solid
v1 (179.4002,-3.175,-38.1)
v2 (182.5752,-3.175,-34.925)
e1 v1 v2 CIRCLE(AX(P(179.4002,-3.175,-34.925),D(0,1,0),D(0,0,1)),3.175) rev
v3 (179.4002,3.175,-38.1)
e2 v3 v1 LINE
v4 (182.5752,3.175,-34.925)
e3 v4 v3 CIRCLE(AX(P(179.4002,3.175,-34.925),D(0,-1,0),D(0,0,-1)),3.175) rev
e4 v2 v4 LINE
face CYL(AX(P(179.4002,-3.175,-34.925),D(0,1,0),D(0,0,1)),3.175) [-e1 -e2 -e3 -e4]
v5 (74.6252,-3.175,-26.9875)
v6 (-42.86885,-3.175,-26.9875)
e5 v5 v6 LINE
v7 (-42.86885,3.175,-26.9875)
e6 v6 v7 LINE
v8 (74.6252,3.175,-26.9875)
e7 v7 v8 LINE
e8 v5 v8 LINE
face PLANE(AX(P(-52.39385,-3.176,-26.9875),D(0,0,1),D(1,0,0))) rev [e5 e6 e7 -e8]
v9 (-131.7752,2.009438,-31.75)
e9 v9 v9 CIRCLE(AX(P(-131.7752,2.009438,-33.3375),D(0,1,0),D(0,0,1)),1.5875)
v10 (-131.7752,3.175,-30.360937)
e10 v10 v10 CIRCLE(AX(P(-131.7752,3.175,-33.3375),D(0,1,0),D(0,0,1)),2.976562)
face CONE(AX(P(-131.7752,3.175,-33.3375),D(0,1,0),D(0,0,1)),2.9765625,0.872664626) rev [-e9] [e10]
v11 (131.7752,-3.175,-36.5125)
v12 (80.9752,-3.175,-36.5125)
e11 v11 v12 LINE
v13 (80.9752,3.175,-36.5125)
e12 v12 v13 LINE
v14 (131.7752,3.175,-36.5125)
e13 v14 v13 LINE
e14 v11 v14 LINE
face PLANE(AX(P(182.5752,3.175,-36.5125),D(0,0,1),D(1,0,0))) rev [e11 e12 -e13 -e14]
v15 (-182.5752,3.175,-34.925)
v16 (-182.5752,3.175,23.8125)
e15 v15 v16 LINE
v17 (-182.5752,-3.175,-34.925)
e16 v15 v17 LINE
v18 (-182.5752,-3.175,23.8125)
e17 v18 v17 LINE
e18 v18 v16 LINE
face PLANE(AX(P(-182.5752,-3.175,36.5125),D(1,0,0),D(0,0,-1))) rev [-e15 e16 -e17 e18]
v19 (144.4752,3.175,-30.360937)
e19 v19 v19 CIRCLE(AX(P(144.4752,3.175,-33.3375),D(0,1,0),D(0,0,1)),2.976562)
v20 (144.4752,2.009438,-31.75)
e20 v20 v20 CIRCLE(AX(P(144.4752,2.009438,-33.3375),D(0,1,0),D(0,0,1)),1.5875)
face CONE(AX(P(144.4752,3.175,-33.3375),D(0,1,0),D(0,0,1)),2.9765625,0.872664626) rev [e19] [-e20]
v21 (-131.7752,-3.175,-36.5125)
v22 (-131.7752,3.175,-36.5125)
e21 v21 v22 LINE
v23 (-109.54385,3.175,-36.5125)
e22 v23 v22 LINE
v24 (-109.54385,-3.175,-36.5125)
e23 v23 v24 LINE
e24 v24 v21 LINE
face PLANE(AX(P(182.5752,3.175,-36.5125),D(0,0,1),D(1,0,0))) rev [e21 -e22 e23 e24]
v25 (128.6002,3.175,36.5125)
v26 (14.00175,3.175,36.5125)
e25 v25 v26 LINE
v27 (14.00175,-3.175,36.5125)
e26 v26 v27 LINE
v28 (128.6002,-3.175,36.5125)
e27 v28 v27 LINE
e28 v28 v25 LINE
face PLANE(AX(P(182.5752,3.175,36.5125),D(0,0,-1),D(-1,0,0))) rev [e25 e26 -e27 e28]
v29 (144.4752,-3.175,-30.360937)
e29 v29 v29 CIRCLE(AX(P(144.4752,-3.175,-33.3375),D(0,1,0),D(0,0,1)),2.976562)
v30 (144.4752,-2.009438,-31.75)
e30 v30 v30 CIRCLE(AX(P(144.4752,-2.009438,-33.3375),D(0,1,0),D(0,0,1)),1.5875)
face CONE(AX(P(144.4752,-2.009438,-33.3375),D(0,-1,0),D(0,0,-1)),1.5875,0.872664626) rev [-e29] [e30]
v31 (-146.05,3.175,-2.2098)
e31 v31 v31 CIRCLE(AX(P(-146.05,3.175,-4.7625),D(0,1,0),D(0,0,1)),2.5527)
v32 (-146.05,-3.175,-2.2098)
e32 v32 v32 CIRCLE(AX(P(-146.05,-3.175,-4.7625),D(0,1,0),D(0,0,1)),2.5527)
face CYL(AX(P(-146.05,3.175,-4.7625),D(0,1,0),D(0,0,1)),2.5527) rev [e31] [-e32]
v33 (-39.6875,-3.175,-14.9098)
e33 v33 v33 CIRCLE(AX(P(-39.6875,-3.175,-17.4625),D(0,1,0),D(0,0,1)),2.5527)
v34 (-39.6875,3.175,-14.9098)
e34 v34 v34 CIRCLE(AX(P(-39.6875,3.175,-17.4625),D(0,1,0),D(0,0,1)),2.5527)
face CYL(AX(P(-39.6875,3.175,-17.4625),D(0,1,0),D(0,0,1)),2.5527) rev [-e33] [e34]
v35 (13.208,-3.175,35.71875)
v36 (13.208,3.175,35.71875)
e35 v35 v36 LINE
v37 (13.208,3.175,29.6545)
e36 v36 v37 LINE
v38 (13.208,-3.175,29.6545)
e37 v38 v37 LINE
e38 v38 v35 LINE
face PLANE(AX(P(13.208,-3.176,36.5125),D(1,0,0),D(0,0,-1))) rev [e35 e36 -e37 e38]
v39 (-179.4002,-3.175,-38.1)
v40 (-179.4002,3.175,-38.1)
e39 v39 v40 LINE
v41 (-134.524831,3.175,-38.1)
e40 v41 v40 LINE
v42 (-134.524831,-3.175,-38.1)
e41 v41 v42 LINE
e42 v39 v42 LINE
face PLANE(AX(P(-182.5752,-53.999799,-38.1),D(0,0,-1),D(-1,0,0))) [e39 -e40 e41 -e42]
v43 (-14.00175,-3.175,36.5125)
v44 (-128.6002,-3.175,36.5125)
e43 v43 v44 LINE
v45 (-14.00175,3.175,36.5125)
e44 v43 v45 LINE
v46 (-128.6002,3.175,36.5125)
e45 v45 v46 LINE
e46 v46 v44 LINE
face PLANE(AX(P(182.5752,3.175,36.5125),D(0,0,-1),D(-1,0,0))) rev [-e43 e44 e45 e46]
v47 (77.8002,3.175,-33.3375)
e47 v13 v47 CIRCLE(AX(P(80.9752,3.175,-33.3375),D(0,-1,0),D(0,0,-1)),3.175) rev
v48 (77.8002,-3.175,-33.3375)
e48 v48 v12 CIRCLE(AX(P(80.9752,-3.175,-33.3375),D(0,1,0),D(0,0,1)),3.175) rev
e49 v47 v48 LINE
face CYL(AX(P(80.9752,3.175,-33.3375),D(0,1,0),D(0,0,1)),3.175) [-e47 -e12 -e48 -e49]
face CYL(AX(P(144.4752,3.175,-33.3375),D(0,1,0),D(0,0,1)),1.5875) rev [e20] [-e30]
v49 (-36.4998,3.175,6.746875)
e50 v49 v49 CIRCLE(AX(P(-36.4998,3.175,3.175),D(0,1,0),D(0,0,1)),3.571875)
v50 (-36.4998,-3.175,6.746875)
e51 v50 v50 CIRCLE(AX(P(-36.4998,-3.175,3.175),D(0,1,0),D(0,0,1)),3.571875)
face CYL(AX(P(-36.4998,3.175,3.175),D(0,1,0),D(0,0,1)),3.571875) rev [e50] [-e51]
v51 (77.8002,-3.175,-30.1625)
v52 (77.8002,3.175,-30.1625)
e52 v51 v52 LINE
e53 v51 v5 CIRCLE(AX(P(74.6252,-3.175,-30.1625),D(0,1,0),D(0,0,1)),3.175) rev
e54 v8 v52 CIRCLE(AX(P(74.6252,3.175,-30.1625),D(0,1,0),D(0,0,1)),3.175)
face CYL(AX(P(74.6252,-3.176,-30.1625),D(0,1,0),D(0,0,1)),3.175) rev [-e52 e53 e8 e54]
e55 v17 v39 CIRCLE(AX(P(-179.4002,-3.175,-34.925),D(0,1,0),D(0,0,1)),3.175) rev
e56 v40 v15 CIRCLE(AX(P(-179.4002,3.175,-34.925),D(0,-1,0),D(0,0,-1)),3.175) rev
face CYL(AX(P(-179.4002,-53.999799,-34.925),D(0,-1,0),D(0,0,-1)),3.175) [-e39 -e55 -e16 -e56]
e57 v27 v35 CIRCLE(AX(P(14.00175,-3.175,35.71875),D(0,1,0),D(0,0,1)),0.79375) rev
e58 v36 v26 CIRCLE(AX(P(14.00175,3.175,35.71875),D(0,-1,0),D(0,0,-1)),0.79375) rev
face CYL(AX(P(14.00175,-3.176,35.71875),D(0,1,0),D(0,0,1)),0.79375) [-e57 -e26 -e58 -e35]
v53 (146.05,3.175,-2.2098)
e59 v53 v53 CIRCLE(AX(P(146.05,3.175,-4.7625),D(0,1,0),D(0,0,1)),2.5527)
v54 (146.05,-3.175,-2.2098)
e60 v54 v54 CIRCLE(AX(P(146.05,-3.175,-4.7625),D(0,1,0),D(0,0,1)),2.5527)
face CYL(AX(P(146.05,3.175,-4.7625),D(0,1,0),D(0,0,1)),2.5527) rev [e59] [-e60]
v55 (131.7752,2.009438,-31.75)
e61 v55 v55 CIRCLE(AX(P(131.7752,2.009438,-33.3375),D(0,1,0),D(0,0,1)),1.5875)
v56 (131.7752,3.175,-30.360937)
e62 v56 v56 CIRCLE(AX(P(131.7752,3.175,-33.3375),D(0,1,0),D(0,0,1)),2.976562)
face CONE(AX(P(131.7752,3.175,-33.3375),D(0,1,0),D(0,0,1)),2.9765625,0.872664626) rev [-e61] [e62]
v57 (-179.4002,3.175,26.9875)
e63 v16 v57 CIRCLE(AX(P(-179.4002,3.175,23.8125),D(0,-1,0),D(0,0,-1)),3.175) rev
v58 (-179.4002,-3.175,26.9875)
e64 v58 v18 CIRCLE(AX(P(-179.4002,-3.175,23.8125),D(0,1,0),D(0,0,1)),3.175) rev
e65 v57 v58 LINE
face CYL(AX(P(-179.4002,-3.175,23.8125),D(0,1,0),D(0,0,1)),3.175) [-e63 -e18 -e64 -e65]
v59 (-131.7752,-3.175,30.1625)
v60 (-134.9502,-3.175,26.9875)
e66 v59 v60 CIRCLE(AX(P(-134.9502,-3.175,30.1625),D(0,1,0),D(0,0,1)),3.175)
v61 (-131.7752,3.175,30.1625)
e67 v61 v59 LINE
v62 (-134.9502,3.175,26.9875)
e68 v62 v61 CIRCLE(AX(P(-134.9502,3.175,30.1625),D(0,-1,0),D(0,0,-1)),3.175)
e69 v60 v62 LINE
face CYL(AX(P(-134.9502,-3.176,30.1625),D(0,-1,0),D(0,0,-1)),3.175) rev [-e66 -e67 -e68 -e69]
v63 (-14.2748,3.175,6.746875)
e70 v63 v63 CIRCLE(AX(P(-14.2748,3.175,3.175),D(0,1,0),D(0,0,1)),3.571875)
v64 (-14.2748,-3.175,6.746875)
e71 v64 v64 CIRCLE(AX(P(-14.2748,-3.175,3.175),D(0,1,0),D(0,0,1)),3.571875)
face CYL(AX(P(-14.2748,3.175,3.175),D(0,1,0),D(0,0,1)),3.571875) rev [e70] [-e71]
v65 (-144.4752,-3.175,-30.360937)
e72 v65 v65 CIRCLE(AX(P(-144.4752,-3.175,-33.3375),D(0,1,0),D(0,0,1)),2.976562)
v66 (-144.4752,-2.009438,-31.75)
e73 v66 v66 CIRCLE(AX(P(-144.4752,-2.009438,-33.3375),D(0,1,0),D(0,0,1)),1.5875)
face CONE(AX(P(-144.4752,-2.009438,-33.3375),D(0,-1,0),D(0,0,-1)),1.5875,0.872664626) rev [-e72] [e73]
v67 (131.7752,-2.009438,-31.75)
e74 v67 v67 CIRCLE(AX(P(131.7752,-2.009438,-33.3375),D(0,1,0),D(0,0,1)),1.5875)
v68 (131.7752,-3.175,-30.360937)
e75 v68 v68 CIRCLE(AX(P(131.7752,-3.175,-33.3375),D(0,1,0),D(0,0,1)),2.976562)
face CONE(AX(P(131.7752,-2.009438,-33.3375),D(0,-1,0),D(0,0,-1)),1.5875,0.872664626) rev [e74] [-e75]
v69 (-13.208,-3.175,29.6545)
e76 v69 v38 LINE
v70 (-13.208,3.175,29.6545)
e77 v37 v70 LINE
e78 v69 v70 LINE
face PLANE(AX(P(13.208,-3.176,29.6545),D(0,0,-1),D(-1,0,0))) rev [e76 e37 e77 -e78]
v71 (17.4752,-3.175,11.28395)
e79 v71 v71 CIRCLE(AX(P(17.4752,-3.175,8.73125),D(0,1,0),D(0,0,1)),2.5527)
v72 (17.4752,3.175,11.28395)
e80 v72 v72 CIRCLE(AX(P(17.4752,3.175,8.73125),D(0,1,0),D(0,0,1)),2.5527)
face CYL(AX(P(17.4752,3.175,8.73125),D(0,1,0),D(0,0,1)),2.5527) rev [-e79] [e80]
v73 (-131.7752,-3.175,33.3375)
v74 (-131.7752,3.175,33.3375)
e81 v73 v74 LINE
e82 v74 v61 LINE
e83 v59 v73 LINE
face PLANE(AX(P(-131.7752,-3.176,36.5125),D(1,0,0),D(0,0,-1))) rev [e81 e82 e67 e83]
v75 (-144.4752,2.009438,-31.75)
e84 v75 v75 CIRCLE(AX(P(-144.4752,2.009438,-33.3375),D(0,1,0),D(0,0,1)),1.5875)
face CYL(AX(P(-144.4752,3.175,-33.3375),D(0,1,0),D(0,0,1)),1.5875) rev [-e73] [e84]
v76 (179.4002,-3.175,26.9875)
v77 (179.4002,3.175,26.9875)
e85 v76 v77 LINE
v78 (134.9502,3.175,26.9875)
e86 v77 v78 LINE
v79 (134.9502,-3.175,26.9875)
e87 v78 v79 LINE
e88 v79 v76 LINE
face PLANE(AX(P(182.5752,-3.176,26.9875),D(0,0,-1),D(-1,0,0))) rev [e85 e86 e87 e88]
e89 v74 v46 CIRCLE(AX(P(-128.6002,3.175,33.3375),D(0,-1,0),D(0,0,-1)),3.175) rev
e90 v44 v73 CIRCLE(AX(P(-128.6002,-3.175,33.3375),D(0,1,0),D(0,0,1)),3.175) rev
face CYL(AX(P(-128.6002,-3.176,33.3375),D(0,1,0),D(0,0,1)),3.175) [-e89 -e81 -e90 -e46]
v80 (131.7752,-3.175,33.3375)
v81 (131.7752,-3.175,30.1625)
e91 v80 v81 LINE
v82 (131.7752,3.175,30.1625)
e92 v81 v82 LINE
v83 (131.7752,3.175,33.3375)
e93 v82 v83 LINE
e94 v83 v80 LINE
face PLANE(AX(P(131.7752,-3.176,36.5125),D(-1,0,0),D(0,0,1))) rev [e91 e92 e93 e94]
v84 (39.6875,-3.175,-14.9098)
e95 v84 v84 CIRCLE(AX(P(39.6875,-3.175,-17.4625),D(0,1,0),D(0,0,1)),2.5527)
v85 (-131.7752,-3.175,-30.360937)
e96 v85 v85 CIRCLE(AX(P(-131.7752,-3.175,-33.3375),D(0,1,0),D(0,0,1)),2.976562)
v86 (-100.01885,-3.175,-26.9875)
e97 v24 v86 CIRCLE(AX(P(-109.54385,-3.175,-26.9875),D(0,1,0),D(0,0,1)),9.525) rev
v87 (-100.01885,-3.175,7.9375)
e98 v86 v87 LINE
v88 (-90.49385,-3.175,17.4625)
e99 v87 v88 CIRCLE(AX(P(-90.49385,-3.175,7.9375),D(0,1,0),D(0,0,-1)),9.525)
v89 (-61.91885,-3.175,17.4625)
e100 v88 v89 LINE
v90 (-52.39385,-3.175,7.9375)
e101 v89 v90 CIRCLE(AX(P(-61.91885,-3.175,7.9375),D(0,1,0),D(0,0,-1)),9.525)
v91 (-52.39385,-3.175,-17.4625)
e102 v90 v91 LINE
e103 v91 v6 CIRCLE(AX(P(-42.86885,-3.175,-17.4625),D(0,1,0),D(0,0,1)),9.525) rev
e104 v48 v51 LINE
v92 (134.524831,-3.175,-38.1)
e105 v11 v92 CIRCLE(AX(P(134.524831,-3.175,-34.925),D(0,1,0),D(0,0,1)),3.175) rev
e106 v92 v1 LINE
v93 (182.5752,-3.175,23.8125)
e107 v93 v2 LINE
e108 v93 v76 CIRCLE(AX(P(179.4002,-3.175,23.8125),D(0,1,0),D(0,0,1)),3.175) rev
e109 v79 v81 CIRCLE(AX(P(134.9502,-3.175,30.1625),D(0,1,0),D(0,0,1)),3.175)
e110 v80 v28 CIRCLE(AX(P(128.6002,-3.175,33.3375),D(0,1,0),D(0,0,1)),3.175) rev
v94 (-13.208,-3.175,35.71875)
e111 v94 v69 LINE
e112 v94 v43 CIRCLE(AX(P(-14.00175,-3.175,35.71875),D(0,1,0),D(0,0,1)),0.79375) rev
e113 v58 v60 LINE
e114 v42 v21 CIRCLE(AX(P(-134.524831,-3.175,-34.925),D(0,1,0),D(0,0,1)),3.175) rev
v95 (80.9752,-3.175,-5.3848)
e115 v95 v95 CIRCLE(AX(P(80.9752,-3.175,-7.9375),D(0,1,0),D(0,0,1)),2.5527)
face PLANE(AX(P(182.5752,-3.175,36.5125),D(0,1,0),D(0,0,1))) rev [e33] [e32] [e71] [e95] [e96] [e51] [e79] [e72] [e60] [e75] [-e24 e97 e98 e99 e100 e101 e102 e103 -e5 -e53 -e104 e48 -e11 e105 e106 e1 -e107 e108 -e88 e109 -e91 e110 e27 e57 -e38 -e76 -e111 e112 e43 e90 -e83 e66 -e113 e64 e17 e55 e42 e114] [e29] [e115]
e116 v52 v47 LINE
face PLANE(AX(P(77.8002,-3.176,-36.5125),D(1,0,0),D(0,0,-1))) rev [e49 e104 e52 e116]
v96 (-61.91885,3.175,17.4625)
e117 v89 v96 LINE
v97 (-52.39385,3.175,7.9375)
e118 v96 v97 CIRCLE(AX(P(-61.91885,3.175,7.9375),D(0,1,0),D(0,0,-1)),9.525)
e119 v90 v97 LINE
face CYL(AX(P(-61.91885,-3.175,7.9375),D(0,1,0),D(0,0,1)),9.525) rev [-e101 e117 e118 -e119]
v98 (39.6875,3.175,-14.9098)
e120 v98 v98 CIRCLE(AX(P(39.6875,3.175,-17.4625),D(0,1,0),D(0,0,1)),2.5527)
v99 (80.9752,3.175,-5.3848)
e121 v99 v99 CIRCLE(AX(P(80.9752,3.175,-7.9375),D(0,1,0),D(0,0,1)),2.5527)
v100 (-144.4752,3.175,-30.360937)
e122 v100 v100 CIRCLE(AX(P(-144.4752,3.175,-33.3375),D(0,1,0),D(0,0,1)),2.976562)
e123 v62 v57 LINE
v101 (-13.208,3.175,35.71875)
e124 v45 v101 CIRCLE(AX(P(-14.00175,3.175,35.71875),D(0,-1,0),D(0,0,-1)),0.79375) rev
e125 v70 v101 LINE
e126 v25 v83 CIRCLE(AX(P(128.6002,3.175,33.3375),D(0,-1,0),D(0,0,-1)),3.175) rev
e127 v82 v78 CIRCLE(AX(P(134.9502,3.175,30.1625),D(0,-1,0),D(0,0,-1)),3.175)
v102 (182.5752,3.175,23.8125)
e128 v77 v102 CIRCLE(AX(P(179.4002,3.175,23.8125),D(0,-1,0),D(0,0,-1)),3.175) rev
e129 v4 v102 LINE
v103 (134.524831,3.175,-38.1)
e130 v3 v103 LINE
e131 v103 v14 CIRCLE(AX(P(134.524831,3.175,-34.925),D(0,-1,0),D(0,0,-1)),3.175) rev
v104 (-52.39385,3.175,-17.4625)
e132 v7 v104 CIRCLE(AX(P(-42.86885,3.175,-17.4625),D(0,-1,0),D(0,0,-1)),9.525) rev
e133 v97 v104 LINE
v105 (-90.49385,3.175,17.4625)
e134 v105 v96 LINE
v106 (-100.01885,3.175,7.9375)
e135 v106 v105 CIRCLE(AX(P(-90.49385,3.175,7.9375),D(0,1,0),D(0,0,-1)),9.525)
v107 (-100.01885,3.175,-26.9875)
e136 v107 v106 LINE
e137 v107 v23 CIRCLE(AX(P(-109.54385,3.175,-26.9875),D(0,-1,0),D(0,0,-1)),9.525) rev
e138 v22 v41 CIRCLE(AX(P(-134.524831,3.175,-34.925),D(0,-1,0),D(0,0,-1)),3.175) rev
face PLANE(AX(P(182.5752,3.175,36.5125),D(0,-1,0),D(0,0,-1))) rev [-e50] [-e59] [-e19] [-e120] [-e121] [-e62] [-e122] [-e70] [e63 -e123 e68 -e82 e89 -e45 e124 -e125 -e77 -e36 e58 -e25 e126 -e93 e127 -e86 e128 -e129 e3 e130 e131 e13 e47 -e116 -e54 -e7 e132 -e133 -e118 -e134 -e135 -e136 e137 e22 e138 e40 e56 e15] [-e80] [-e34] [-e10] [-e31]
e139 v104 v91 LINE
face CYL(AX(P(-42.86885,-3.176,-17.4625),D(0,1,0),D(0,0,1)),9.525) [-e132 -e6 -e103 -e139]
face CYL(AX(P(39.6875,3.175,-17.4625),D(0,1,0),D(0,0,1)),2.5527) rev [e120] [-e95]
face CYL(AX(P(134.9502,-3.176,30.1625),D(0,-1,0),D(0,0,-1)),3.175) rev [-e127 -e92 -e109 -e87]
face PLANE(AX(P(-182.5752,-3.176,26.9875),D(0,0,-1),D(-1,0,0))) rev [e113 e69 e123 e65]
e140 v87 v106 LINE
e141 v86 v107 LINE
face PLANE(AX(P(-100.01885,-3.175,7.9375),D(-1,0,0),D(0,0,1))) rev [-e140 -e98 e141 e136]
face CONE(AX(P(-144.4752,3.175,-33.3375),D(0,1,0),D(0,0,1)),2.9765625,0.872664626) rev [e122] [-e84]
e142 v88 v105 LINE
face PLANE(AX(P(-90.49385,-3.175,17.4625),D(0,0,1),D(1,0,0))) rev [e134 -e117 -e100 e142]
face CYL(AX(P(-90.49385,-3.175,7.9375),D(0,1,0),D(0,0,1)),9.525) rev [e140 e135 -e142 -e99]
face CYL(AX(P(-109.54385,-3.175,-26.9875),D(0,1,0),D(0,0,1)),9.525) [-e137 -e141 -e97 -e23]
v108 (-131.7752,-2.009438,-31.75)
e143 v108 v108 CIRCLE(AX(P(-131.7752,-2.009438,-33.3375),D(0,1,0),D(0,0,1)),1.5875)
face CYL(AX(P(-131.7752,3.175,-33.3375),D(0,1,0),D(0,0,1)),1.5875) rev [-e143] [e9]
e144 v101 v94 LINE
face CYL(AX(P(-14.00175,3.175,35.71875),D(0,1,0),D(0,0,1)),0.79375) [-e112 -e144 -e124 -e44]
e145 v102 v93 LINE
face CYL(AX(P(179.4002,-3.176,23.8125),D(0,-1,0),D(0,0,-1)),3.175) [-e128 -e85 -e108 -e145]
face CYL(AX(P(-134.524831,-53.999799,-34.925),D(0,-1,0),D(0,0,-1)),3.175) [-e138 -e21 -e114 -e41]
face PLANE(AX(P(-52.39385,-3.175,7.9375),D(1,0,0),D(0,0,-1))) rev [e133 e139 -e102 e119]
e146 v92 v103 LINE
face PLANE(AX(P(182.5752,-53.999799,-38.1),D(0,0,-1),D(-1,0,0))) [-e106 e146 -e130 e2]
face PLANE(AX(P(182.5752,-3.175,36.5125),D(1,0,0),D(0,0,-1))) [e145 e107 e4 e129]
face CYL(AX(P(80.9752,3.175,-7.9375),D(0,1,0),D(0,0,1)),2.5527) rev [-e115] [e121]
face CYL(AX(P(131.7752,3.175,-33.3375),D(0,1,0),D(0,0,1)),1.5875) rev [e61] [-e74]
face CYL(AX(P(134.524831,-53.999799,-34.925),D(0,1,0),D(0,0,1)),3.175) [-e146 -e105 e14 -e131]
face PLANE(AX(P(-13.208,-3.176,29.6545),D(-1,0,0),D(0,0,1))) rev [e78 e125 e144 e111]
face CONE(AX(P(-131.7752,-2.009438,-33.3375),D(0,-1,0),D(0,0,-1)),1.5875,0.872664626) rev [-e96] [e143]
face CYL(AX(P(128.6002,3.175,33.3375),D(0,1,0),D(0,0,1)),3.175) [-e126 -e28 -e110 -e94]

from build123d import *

# Parameters (mm, degrees)
SKETCH1_W                             = 73.025
SKETCH1_H                             = 6.35
EXTRUDE1_DEPTH                        = 182.5752
CUT_EXTRUDE1_DEPTH                    = 187.298654883
F_1_4_20_TAPPED_HOLE1_D               = 5.1054
F_1_8_0_125_DIAMETER_HOLE3_AT_2_COUNT = 2
F_1_8_0_125_DIAMETER_HOLE3_AT_2_PITCH = 12.7
F_1_8_0_125_DIAMETER_HOLE3_AT_3_COUNT = 2
F_1_8_0_125_DIAMETER_HOLE3_AT_3_PITCH = 276.2504
F_1_8_0_125_DIAMETER_HOLE3_AT_4_COUNT = 2
F_1_8_0_125_DIAMETER_HOLE3_AT_4_PITCH = 263.5504
CUT_EXTRUDE2_REACH                    = 188.299
SKETCH8_W                             = 50.8
SKETCH8_H                             = 9.525
CUT_EXTRUDE3_REACH                    = 188.299
SKETCH14_W                            = 50.8
SKETCH14_H                            = 1.5875
BOSS_EXTRUDE1_DEPTH                   = 6.35
FILLET1_R                             = 3.175
CUT_EXTRUDE4_REACH                    = 188.616
SKETCH18_W                            = 26.416
SKETCH18_H                            = 6.858
FILLET2_R                             = 0.79375
FILLET3_R                             = 9.525
F_9_32_0_28125_DIAMETER_HOLE2_D       = 7.14375
F_1_4_20_START                        = -4
F_1_4_20_TAPPED_HOLE2_OUTLINE_R       = 2.5527
F_1_4_20_TAPPED_HOLE2_DEPTH           = 8


with BuildPart() as part:
    # Sketch1 → Extrude1 (new, symmetric)
    with BuildSketch(Plane(origin=(0, 0, 0), x_dir=(0, 0, -1), z_dir=(1, 0, 0))):
        Rectangle(SKETCH1_W, SKETCH1_H)
    extrude(amount=EXTRUDE1_DEPTH, both=True)

    # Sketch2 → Cut-Extrude1 (cut, through all)
    with BuildSketch(Plane(origin=(0, 3.175, 0), x_dir=(-1, 0, 0), z_dir=(0, 1, 0))):
        with BuildLine():
            Line((100.01885, 7.9375), (100.01885, -36.5125))
            Line((100.01885, -36.5125), (52.39385, -36.5125))
            Line((52.39385, -36.5125), (52.39385, 7.9375))
            ThreePointArc((52.39385, 7.9375), (55.183657909, 14.672692091), (61.91885, 17.4625))
            Line((61.91885, 17.4625), (90.49385, 17.4625))
            ThreePointArc((90.49385, 17.4625), (97.229042091, 14.672692091), (100.01885, 7.9375))
        make_face()
    extrude(amount=-CUT_EXTRUDE1_DEPTH, mode=Mode.SUBTRACT)

    # 1/4-20 Tapped Hole1 (through all)
    with Locations(Plane(origin=(0, 3.175, 0), x_dir=(-1, 0, 0), z_dir=(0, 1, 0))):
        with Locations((146.05, -4.7625), (-17.4752, 8.73125), (-80.9752, -7.9375), (-146.05, -4.7625)):
            Hole(F_1_4_20_TAPPED_HOLE1_D / 2)

    # Sketch5 → 1/8 (0.125) Diameter Hole3 (revolve, cut)
    with BuildSketch(Plane(origin=(131.7752, 3.175, -33.3375), x_dir=(0, 0, 1), z_dir=(1, 0, 0))):
        Polygon((0, 0), (0, 6.35), (2.9765625, 6.35), (1.5875, 5.184438169), (1.5875, 1.165561831), (2.9765625, 0), align=None)
    f_1_8_0_125_diameter_hole3 = revolve(axis=Axis((131.7752, 9.525, -33.3375), (0, -1, 0)), mode=Mode.SUBTRACT)

    # 1/8 (0.125) Diameter Hole3 at 2: 1/8 (0.125) Diameter Hole3 ×2
    with Locations(*[(i * F_1_8_0_125_DIAMETER_HOLE3_AT_2_PITCH, 0, 0) for i in range(1, F_1_8_0_125_DIAMETER_HOLE3_AT_2_COUNT)]):
        add(f_1_8_0_125_diameter_hole3, mode=Mode.SUBTRACT)

    # 1/8 (0.125) Diameter Hole3 at 3: 1/8 (0.125) Diameter Hole3 ×2
    with Locations(*[(-i * F_1_8_0_125_DIAMETER_HOLE3_AT_3_PITCH, 0, 0) for i in range(1, F_1_8_0_125_DIAMETER_HOLE3_AT_3_COUNT)]):
        add(f_1_8_0_125_diameter_hole3, mode=Mode.SUBTRACT)

    # 1/8 (0.125) Diameter Hole3 at 4: 1/8 (0.125) Diameter Hole3 ×2
    with Locations(*[(-i * F_1_8_0_125_DIAMETER_HOLE3_AT_4_PITCH, 0, 0) for i in range(1, F_1_8_0_125_DIAMETER_HOLE3_AT_4_COUNT)]):
        add(f_1_8_0_125_diameter_hole3, mode=Mode.SUBTRACT)

    # Sketch8 → Cut-Extrude2 (cut, up to next)
    with BuildSketch(Plane(origin=(0, 3.175, 0), x_dir=(1, 0, 0), z_dir=(0, 1, 0)), mode=Mode.PRIVATE) as cut_extrude2_sk1:
        with Locations((-157.1752, -31.75)):
            Rectangle(SKETCH8_W, SKETCH8_H)
    cut_extrude2_tool1 = extrude(cut_extrude2_sk1.sketch, amount=-CUT_EXTRUDE2_REACH, mode=Mode.PRIVATE) & part.part
    # Sketch8 → Cut-Extrude2 (cut, up to next)
    with BuildSketch(Plane(origin=(0, 3.175, 0), x_dir=(1, 0, 0), z_dir=(0, 1, 0)), mode=Mode.PRIVATE) as cut_extrude2_sk2:
        with Locations((157.1752, -31.75)):
            Rectangle(SKETCH8_W, SKETCH8_H)
    cut_extrude2_tool2 = extrude(cut_extrude2_sk2.sketch, amount=-CUT_EXTRUDE2_REACH, mode=Mode.PRIVATE) & part.part
    add(cut_extrude2_tool1.solids().sort_by_distance((-157.1752, 3.175, 31.75))[0], mode=Mode.SUBTRACT)
    add(cut_extrude2_tool2.solids().sort_by_distance((157.1752, 3.175, 31.75))[0], mode=Mode.SUBTRACT)

    # Sketch13 → Cut-Extrude3 (cut, up to next)
    with BuildSketch(Plane(origin=(0, 3.175, 0), x_dir=(1, 0, 0), z_dir=(0, 1, 0)), mode=Mode.PRIVATE) as cut_extrude3_sk1:
        with BuildLine():
            Line((-52.39385, 36.5125), (77.8002, 36.5125))
            Line((77.8002, 36.5125), (77.8002, 30.1625))
            ThreePointArc((77.8002, 30.1625), (76.87026403, 27.91743597), (74.6252, 26.9875))
            Line((74.6252, 26.9875), (-52.39385, 26.9875))
            Line((-52.39385, 26.9875), (-52.39385, 36.5125))
        make_face()
    cut_extrude3_tool1 = extrude(cut_extrude3_sk1.sketch, amount=-CUT_EXTRUDE3_REACH, mode=Mode.PRIVATE) & part.part
    add(cut_extrude3_tool1.solids().sort_by_distance((12.590656, 3.175, -31.757083))[0], mode=Mode.SUBTRACT)

    # Sketch14 → Boss-Extrude1 (add)
    with BuildSketch(Plane(origin=(0, 3.175, 0), x_dir=(1, 0, 0), z_dir=(0, 1, 0))):
        with Locations((157.1752, 37.30625)):
            Rectangle(SKETCH14_W, SKETCH14_H)
        with Locations((-157.1752, 37.30625)):
            Rectangle(SKETCH14_W, SKETCH14_H)
    extrude(amount=-BOSS_EXTRUDE1_DEPTH)

    # Fillet1
    # the kernel refuses this fillet: 3.175 mm, written as the material it adds along each edge
    with BuildSketch(Plane(origin=(131.7752, 3.175, 26.9875), x_dir=(0, 0, 1), z_dir=(0, -1, 0)), Plane(origin=(-131.7752, 3.175, 26.9875), x_dir=(-1, 0, 0), z_dir=(0, -1, 0))) as fillet1_piece_1:
        with BuildLine():
            CenterArc((FILLET1_R, -FILLET1_R), FILLET1_R, 90, 90)
            Line((0, -FILLET1_R), (0, 0))
            Line((0, 0), (FILLET1_R, 0))
        make_face()
    extrude(amount=6.35)
    # the kernel refuses this fillet: 3.175 mm, written as the material it takes off along each edge
    with BuildSketch(Plane(origin=(182.5752, 11.1125, 26.9875), x_dir=(0, 0, -1), z_dir=(0, -1, 0)), Plane(origin=(77.8002, 11.1125, -36.5125), x_dir=(0, 0, 1), z_dir=(0, -1, 0)), Plane(origin=(182.5752, 11.1125, -38.1), x_dir=(-1, 0, 0), z_dir=(0, -1, 0)), Plane(origin=(-182.5752, 11.1125, -38.1), x_dir=(0, 0, 1), z_dir=(0, -1, 0)), Plane(origin=(-182.5752, 11.1125, 26.9875), x_dir=(1, 0, 0), z_dir=(0, -1, 0)), Plane(origin=(-131.7752, 11.1125, 36.5125), x_dir=(1, 0, 0), z_dir=(0, -1, 0))) as fillet1_2_piece_1:
        with BuildLine():
            CenterArc((FILLET1_R, -FILLET1_R), FILLET1_R, 90, 90)
            Line((0, -FILLET1_R), (0, 0))
            Line((0, 0), (FILLET1_R, 0))
        make_face()
    extrude(amount=22.225, mode=Mode.SUBTRACT)
    with BuildSketch(Plane(origin=(131.7752, 11.1125, 36.5125), x_dir=(-1, 0, 0), z_dir=(0, -1, 0))) as fillet1_2_piece_2:
        with BuildLine():
            CenterArc((FILLET1_R, FILLET1_R), FILLET1_R, 180, 90)
            Line((0, FILLET1_R), (0, 0))
            Line((0, 0), (FILLET1_R, 0))
        make_face()
    extrude(amount=22.225, mode=Mode.SUBTRACT)
    with BuildSketch(Plane(origin=(131.7752, 10.049076643, -38.1), x_dir=(0, 0, 1), z_dir=(0, -1, 0))) as fillet1_2_piece_3:
        with BuildLine():
            CenterArc((3.175, -2.749630657), FILLET1_R, 120, 60)
            Line((0, -2.749630657), (0, 0))
            Line((0, 0), (1.5875, 0))
        make_face()
    extrude(amount=20.098153285, mode=Mode.SUBTRACT)
    with BuildSketch(Plane(origin=(-131.7752, 10.049076643, -38.1), x_dir=(-1, 0, 0), z_dir=(0, -1, 0))) as fillet1_2_piece_4:
        with BuildLine():
            CenterArc((2.749630657, -3.175), FILLET1_R, 90, 60)
            Line((0, -1.5875), (0, 0))
            Line((0, 0), (2.749630657, 0))
        make_face()
    extrude(amount=20.098153285, mode=Mode.SUBTRACT)

    # Sketch18 → Cut-Extrude4 (cut, up to next)
    with BuildSketch(Plane(origin=(0, 3.175, 0), x_dir=(1, 0, 0), z_dir=(0, 1, 0)), mode=Mode.PRIVATE) as cut_extrude4_sk1:
        with Locations((0, -33.0835)):
            Rectangle(SKETCH18_W, SKETCH18_H)
    cut_extrude4_tool1 = extrude(cut_extrude4_sk1.sketch, amount=-CUT_EXTRUDE4_REACH, mode=Mode.PRIVATE) & part.part
    add(cut_extrude4_tool1.solids().sort_by_distance((0, 3.175, 33.0835))[0], mode=Mode.SUBTRACT)

    # Fillet2
    fillet2_edges = [part.edges().sort_by_distance(p)[0] for p in [
        (13.208, 0, 36.5125),
        (-13.208, 0, 36.5125),
    ]]
    fillet(fillet2_edges, radius=FILLET2_R)

    # Fillet3
    fillet3_edges = [part.edges().sort_by_distance(p)[0] for p in [
        (-52.39385, 0, -26.9875),
        (-100.01885, 0, -36.5125),
    ]]
    fillet(fillet3_edges, radius=FILLET3_R)

    # 9/32 (0.28125) Diameter Hole2 (through all)
    with Locations(Plane(origin=(0, 3.175, 0), x_dir=(1, 0, 0), z_dir=(0, 1, 0))):
        with Locations((-36.4998, -3.175), (-14.2748, -3.175)):
            Hole(F_9_32_0_28125_DIAMETER_HOLE2_D / 2)

    # 1/4-20 Tapped Hole2: read off the stored shape, not the designer's step
    # 1/4-20 Tapped Hole2 outline → 1/4-20 Tapped Hole2 (cut)
    with BuildSketch(Plane(origin=(0, 0, 0), x_dir=(1, 0, 0), z_dir=(0, 1, 0)).offset(F_1_4_20_START)):
        with Locations((-39.6875, 17.4625)):
            Circle(F_1_4_20_TAPPED_HOLE2_OUTLINE_R)
        with Locations((39.6875, 17.4625)):
            Circle(F_1_4_20_TAPPED_HOLE2_OUTLINE_R)
    extrude(amount=F_1_4_20_TAPPED_HOLE2_DEPTH, mode=Mode.SUBTRACT)


solid = part.part
